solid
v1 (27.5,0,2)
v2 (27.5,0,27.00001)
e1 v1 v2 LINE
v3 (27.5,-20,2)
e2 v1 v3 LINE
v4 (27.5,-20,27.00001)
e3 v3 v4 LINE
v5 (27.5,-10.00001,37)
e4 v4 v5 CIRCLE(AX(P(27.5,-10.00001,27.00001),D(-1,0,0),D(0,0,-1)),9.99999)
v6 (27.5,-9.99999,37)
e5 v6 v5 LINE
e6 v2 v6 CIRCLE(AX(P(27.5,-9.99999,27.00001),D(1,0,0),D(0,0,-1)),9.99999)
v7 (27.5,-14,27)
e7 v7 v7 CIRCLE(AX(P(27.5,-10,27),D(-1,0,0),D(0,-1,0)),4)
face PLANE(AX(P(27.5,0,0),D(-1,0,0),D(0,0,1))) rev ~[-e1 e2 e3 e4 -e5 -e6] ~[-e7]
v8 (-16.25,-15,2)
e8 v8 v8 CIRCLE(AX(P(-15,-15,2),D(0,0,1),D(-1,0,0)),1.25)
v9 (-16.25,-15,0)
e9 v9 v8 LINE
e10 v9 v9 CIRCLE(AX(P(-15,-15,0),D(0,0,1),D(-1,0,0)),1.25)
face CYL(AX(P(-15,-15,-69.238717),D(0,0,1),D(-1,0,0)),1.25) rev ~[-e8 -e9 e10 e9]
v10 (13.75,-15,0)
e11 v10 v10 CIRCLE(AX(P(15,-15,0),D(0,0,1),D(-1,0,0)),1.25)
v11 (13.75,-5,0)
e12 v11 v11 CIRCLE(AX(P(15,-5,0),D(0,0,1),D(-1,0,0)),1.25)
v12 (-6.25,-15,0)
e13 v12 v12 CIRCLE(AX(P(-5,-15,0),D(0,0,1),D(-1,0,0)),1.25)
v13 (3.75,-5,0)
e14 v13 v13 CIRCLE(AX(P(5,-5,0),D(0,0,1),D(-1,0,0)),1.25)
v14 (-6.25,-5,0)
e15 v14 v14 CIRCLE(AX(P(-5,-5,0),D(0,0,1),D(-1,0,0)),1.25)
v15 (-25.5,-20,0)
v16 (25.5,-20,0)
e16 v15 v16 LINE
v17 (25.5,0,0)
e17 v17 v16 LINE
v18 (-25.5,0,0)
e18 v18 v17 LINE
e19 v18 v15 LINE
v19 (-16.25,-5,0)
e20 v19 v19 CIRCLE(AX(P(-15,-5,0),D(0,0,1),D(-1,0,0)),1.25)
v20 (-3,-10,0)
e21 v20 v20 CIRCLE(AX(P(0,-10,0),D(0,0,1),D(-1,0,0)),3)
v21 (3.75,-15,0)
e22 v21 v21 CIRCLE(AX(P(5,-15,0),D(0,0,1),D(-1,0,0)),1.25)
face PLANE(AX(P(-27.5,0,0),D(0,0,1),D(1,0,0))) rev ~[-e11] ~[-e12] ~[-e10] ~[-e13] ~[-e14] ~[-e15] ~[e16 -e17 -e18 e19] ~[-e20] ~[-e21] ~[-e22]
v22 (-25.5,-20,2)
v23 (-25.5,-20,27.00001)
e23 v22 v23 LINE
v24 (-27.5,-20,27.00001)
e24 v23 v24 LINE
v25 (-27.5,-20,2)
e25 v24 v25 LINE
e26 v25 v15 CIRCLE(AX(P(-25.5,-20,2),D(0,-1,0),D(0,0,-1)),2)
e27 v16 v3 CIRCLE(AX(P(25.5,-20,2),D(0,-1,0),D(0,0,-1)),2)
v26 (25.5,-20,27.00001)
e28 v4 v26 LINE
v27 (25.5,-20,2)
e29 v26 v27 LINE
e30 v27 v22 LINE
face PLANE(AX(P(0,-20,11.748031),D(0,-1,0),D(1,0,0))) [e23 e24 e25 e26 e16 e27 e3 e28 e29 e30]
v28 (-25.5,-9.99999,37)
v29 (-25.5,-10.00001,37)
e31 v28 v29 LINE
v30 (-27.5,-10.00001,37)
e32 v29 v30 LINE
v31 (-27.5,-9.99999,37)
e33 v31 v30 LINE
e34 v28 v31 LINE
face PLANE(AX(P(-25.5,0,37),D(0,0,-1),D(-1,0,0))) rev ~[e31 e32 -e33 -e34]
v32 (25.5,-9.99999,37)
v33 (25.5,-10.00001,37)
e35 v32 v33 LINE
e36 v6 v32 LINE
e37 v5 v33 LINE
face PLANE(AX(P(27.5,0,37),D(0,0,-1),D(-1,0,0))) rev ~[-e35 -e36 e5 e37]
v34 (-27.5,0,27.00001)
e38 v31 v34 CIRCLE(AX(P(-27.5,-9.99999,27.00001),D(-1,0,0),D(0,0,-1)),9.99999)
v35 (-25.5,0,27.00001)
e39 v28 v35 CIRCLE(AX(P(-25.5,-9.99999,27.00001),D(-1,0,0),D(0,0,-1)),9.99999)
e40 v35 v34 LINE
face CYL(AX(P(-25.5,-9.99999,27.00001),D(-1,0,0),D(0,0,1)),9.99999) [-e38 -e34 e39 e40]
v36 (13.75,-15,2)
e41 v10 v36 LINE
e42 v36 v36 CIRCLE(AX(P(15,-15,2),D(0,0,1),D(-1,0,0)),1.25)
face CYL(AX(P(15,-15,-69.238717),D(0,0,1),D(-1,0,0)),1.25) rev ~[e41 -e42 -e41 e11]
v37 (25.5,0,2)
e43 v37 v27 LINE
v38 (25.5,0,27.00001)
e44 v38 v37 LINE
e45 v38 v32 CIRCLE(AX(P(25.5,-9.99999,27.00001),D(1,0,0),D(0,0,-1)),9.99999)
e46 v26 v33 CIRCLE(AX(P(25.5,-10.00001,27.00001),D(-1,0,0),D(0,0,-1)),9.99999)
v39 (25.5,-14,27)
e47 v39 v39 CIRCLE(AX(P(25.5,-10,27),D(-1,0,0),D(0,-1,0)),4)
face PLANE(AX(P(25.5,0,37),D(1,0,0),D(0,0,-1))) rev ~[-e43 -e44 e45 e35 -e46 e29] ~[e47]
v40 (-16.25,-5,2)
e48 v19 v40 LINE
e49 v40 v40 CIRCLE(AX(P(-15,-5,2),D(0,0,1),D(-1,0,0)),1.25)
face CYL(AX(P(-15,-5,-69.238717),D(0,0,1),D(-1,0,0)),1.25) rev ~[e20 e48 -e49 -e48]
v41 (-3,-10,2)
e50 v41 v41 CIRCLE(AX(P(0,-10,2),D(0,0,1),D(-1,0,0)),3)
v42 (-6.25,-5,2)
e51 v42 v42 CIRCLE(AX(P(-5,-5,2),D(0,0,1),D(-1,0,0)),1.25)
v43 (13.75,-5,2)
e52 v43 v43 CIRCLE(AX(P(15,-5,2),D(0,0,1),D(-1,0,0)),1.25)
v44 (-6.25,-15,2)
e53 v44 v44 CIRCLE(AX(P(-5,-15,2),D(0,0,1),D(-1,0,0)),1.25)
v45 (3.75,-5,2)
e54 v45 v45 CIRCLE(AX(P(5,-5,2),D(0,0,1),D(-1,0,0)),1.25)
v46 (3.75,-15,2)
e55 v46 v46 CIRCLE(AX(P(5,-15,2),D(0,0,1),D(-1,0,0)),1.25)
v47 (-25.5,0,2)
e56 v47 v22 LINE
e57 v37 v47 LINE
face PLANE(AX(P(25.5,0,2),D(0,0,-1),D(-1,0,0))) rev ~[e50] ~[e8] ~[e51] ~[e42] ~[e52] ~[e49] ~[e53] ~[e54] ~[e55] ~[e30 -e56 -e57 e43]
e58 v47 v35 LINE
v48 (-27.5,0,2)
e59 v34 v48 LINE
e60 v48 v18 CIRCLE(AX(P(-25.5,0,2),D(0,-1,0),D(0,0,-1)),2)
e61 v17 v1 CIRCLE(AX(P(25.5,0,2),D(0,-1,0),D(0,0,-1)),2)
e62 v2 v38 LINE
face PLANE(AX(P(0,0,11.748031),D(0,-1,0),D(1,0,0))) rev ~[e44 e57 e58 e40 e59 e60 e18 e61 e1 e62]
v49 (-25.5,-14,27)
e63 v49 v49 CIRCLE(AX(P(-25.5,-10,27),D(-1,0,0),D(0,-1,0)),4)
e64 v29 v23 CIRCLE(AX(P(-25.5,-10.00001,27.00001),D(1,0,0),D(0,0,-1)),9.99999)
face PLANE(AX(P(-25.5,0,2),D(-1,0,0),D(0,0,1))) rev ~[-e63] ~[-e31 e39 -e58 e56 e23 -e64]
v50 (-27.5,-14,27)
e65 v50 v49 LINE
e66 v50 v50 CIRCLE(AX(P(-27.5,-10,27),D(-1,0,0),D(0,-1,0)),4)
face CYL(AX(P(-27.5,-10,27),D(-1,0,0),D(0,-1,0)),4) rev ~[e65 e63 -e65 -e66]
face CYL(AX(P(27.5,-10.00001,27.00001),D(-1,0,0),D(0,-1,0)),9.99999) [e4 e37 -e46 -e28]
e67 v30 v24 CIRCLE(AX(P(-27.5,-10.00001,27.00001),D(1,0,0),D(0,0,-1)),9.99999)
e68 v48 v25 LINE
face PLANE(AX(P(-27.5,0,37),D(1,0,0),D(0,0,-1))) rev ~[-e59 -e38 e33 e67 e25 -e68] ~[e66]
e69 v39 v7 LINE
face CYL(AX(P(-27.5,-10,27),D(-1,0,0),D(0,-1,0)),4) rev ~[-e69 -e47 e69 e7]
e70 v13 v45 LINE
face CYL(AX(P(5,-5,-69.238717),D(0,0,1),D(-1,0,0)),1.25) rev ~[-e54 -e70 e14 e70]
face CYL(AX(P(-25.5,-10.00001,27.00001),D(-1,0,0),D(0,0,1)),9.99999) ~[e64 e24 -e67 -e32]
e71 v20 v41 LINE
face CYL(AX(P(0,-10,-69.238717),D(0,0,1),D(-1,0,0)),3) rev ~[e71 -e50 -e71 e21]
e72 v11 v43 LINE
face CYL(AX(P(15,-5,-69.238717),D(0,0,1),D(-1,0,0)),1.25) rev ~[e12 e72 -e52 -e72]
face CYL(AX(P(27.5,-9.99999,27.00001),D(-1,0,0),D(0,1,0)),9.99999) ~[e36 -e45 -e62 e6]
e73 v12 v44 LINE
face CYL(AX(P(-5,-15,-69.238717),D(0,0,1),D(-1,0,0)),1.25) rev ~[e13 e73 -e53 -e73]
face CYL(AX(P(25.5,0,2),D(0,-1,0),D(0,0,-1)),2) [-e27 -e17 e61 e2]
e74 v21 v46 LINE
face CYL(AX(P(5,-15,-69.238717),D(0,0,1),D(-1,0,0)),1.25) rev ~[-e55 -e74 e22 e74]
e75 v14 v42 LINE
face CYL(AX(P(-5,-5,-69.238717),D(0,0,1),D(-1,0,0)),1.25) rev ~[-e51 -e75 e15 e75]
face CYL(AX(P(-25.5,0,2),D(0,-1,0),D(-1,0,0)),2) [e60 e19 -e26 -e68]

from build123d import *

# Parameters (mm, degrees)
F1_DEPTH = 20
F2_R     = 4
F3_DEPTH = 65.2
F4_R     = 9.99999
F5_R     = 2
F7_D     = 2.5
F8_D     = 6


# Not quite as in the source:
# - a fillet or chamfer is up to 0.001 mm smaller than in the source, because OpenCascade refuses the exact size


with BuildPart() as f1:
    # F0 (on Front) → F1 (new body)
    with BuildSketch(Plane.XZ):
        Polygon((-25.5, 37), (-27.5, 37), (-27.5, 0), (27.5, 0), (27.5, 37), (25.5, 37), (25.5, 2), (-25.5, 2), align=None)
    extrude(amount=F1_DEPTH)

    # F2 (on face) → F3 (cut)
    with BuildSketch(Plane(origin=(-27.5, 0, 0), x_dir=(0, -1, 0), z_dir=(-1, 0, 0))):
        with Locations((10, 27)):
            Circle(F2_R)
    extrude(amount=-F3_DEPTH, mode=Mode.SUBTRACT)

    # F4 (radius 10 in the source; OpenCascade refuses exactly that, so slightly less here)
    f4_edges = [f1.edges().sort_by_distance(p)[0] for p in [
        (-26.5, 0, 37),
        (-26.5, -20, 37),
        (26.5, 0, 37),
        (26.5, -20, 37),
    ]]
    fillet(f4_edges, radius=F4_R)

    # F5
    f5_edges = [f1.edges().sort_by_distance(p)[0] for p in [
        (-27.5, -10, 0),
        (27.5, -10, 0),
    ]]
    fillet(f5_edges, radius=F5_R)

    # F7 (through all)
    with Locations(Plane(origin=(0, 0, 0), x_dir=(1, 0, 0), z_dir=(0, 0, -1))):
        with Locations((-15, 15), (-5, 15), (5, 15), (15, 15), (-15, 5), (-5, 5), (5, 5), (15, 5)):
            Hole(F7_D / 2)

    # F8 (through all)
    with Locations(Plane(origin=(0, 0, 0), x_dir=(1, 0, 0), z_dir=(0, 0, -1))):
        with Locations((0, 10)):
            Hole(F8_D / 2)


solid = f1.part
